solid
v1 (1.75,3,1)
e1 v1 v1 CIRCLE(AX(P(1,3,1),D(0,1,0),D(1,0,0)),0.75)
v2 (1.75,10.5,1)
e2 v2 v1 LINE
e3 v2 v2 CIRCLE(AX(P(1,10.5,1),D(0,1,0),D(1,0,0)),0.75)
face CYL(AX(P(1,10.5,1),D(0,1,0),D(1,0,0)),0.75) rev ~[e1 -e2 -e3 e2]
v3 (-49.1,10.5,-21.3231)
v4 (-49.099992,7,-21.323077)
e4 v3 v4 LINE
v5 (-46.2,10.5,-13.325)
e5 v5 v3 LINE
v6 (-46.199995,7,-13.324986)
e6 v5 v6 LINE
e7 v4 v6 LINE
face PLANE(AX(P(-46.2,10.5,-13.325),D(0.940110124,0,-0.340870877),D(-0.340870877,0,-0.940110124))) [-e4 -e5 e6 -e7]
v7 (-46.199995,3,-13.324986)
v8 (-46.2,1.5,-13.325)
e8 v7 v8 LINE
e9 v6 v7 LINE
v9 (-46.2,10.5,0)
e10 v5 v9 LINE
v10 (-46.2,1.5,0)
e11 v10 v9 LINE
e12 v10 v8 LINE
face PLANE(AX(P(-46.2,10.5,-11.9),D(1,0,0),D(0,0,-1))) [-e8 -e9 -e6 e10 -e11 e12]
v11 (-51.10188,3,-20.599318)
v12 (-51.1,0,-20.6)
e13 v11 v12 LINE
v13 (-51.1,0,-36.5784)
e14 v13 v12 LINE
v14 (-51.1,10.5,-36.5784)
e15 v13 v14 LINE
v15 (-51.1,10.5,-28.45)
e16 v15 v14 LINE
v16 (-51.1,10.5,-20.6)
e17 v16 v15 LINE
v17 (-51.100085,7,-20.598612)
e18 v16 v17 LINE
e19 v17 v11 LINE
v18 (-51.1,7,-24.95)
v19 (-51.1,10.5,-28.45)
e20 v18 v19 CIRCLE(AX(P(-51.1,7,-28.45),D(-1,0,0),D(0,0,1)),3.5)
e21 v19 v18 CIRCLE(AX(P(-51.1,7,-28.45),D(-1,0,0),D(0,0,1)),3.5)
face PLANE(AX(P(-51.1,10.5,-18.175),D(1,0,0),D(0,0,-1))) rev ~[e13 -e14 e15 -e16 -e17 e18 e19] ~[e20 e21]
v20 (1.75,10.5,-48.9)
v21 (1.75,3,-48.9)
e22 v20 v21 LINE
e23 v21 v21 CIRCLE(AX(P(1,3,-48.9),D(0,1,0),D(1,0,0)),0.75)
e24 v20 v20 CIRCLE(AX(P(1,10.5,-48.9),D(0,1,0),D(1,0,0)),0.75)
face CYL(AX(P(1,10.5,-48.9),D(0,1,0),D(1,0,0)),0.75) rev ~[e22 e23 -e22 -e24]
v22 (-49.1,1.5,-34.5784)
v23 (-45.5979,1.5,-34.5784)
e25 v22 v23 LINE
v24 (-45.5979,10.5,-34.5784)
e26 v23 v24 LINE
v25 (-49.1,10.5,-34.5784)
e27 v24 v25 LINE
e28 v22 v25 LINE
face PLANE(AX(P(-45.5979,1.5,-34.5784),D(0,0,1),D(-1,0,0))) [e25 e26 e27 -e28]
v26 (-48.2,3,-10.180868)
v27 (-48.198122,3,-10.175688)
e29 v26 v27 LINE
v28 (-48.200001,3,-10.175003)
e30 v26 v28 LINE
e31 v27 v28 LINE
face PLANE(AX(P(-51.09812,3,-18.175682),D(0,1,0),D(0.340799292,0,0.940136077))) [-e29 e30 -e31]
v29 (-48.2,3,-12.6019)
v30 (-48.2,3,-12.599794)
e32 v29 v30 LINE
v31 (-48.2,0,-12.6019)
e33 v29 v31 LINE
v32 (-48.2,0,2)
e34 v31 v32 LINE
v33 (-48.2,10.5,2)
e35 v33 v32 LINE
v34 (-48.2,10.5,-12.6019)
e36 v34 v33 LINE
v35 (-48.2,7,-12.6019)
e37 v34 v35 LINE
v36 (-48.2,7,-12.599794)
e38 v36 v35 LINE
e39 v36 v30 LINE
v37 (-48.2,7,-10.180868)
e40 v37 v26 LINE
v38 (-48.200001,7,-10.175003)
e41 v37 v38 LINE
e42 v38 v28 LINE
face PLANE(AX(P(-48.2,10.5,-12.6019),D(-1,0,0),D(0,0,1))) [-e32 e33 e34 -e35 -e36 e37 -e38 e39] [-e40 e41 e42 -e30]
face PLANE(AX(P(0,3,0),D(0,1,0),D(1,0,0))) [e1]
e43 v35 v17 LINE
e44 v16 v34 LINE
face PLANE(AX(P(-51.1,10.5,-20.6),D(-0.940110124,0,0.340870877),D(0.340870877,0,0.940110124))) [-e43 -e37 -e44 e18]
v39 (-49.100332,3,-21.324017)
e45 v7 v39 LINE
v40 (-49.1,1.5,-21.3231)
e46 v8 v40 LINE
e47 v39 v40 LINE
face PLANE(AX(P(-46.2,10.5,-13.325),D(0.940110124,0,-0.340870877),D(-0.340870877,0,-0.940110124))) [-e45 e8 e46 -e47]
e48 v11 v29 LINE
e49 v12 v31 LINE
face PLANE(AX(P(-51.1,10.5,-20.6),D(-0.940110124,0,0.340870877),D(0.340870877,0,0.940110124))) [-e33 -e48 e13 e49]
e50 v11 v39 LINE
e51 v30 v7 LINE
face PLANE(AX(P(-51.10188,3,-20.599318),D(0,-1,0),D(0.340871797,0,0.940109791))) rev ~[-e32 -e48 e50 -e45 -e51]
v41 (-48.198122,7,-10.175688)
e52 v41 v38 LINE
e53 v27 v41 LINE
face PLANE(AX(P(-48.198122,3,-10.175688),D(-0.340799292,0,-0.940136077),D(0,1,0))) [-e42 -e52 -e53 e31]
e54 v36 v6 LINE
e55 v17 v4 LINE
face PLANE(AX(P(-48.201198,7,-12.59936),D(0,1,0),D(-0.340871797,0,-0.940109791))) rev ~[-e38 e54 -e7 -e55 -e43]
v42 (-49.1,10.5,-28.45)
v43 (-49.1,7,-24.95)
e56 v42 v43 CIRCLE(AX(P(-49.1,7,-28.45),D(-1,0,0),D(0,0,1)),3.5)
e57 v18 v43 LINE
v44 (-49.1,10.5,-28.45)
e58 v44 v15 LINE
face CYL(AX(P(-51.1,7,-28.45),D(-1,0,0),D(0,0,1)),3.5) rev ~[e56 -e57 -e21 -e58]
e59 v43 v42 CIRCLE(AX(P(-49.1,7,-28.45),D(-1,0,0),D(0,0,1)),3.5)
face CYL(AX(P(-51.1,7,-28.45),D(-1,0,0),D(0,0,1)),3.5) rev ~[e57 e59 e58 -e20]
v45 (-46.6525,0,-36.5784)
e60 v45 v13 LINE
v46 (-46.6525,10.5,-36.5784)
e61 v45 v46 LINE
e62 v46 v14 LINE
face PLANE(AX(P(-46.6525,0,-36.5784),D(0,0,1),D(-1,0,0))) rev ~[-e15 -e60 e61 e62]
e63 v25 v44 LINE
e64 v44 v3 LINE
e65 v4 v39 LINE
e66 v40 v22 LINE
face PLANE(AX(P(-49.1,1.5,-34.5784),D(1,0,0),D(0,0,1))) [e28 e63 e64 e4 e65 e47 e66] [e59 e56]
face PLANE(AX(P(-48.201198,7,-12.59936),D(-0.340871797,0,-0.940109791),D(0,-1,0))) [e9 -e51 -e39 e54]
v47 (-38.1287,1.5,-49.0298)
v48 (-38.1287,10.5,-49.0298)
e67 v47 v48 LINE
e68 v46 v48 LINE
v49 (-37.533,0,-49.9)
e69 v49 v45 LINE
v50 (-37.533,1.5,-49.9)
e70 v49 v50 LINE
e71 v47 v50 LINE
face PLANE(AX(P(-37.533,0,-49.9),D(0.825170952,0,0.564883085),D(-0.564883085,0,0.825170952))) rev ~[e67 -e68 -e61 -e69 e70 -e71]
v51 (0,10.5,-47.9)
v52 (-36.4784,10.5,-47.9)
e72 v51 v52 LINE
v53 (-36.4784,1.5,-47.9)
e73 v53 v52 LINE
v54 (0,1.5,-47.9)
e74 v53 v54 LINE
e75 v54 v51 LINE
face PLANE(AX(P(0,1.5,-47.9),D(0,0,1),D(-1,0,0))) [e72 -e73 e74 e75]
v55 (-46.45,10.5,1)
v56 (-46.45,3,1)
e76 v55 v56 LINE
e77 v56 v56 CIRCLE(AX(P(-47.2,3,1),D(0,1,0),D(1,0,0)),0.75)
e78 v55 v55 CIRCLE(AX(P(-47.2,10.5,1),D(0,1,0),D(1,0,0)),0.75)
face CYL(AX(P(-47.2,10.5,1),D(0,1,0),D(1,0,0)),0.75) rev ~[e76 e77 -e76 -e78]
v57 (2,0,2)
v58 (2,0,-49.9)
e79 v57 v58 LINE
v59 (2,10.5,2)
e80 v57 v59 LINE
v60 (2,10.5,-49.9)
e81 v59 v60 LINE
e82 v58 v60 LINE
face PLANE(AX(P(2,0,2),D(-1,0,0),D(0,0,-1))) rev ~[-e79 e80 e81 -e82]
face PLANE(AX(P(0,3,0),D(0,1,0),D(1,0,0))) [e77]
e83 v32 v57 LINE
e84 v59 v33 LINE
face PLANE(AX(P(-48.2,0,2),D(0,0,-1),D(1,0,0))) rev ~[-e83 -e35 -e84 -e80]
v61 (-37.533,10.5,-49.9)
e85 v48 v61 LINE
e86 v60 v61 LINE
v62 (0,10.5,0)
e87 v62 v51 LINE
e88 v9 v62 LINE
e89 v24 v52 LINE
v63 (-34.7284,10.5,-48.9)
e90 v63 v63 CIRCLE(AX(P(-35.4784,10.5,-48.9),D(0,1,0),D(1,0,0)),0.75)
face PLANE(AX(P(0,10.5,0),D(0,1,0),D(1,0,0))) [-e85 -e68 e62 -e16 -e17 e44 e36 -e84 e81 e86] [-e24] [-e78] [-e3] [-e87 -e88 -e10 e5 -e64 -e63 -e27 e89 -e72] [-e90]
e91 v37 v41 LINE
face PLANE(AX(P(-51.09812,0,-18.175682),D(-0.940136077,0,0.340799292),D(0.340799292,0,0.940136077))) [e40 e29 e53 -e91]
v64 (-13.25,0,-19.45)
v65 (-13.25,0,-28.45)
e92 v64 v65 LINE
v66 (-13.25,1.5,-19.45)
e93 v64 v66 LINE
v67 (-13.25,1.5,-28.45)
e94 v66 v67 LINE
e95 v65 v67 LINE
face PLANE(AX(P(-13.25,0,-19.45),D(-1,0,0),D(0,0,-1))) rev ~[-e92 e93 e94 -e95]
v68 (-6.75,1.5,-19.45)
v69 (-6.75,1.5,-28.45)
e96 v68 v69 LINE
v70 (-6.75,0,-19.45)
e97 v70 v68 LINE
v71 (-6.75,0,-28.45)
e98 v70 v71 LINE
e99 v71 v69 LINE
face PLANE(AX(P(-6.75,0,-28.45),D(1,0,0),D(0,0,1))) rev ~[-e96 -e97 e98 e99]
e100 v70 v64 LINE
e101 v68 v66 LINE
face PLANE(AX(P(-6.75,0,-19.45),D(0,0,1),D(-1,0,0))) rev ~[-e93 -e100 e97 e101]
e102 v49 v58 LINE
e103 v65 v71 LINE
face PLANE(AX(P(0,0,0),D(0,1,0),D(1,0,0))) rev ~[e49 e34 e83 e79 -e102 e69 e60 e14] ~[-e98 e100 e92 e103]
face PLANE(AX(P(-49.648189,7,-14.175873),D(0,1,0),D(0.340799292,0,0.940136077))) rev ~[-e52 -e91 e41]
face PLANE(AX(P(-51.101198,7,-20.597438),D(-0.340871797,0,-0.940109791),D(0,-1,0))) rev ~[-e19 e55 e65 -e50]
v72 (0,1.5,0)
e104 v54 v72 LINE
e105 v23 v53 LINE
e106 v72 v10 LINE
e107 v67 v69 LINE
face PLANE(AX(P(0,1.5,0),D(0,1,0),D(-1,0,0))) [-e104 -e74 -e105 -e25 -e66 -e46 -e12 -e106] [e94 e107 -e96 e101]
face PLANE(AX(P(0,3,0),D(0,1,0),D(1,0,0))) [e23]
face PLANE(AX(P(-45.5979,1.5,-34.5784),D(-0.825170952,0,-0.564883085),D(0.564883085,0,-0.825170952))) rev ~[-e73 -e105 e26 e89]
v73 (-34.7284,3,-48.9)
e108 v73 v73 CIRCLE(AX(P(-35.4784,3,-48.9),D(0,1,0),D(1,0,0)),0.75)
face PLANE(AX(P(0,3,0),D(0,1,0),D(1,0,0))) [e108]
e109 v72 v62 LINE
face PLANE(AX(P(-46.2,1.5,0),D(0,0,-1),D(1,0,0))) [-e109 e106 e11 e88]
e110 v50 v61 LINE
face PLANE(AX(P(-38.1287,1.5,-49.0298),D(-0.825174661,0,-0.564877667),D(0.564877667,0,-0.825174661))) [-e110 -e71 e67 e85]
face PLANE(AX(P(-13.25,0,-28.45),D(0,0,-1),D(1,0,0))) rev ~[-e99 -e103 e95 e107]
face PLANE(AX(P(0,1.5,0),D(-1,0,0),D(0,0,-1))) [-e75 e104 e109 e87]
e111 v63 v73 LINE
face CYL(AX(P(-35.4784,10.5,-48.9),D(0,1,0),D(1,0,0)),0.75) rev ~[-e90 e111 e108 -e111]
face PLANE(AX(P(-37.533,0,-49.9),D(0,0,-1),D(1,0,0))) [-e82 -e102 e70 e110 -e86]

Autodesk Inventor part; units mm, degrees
ref_plane "YZ Plane" through (0, 0, 0) normal (1, 0, 0) x (0, 1, 0)
ref_plane "XZ Plane" through (0, 0, 0) normal (0, 1, 0) x (-1, 0, 0)
ref_plane "XY Plane" through (0, 0, 0) normal (0, 0, 1) x (1, 0, 0)
sketch "Sketch1" plane through (0, 0, 0) normal (0, 1, 0) x (-1, 0, 0)
  line L0 (0, 0) -> (49.1, 0)
  line L1 (49.1, -47.9) -> (0, -47.9)
  line L2 (0, -47.9) -> (0, 0)
  line L3 (46.7, -10.9) -> (49.1, -18.9)
  line L4 (46.7, -10.9) -> (46.7, 0)
  line L5 (49.1, 0) -> (46.7, 0)
  line L6 (49.1, -18.9) -> (49.1, -47.9)
  dimension "d0" = 49.1
  dimension "d1" = 47.9
  dimension "d2" = 18.9
extrude "Extrusion1" add sketch "Sketch1" along normal blind 1.5
sketch "Sketch2" plane through (0, 1.5, 0) normal (0, 1, 0) x (1, 0, 0)
  line L0 (-49.1, 18.9) -> (-46.7, 10.9) projected
  line L1 (-46.2, 10.9) -> (-46.2, 0)
  line L2 (-46.2, 0) -> (-46.7, 0)
  line L3 (-46.7, 10.9) -> (-46.7, 0) projected
  line L4 (-46.7, 0) -> (-46.7, 10.9)
  line L5 (-49.1, 47.9) -> (-49.1, 18.9) projected
  line L6 (-46.7, 10.9) -> (-49.1, 18.9)
  line L7 (-49.1, 18.9) -> (-46.2, 10.9)
  point P0 (0, 0)
extrude "Extrusion2" cut sketch "Sketch2" against normal blind 10
sketch "Sketch3" plane through (0, 1.5, 0) normal (0, 1, 0) x (1, 0, 0)
  line L0 (-49.1, 47.9) -> (-49.1, 18.9) projected
  line L1 (-49.1, 34.5784) -> (-45.5979, 34.5784)
  line L2 (-45.5979, 34.5784) -> (-36.4784, 47.9)
  line L3 (0, 47.9) -> (-49.1, 47.9) projected
  line L4 (-49.1, 47.9) -> (-36.4784, 47.9)
  line L5 (-49.1, 47.9) -> (-49.1, 34.5784)
  point P0 (0, 0)
extrude "Extrusion3" cut sketch "Sketch3" against normal blind 10
sketch "Sketch4" plane through (0, 1.5, 0) normal (0, 1, 0) x (1, 0, 0)
  line L0 (-46.2, 10.9) -> (-49.1, 18.9) projected
  line L1 (-46.2, 0) -> (0, 0) projected
  line L2 (-46.2, -2) -> (0, -2)
  line L3 (0, -2) -> (2, -2)
  line L4 (2, -2) -> (2, 47.9)
  line L5 (0, 47.9) -> (-36.4784, 47.9) projected
  line L6 (2, 47.9) -> (2, 49.9)
  line L7 (2, 49.9) -> (-36.4784, 49.9)
  line L8 (-38.1287, 49.0298) -> (-37.533, 49.9)
  line L9 (-37.533, 49.9) -> (-36.4784, 49.9)
  line L10 (-45.5979, 34.5784) -> (-36.4784, 47.9) projected
  line L11 (-49.1, 36.5784) -> (-46.6525, 36.5784)
  line L12 (-46.6525, 36.5784) -> (-37.533, 49.9)
  line L13 (-46.2, -2) -> (-48.2, -2)
  line L14 (-48.2, -2) -> (-48.2, 10.9)
  line L15 (-51.1, 18.9) -> (-48.2, 10.9)
  line L16 (-49.1, 36.5784) -> (-51.1, 36.5784)
  line L17 (-51.1, 36.5784) -> (-51.1, 18.9)
  line L18 (0, 0) -> (0, 47.9) projected
  line L19 (0, 0) -> (0, 47.9)
  line L20 (0, 47.9) -> (-36.4784, 47.9)
  line L21 (-36.4784, 47.9) -> (-45.5979, 34.5784)
  line L22 (-45.5979, 34.5784) -> (-49.1, 34.5784) projected
  line L23 (-49.1, 34.5784) -> (-45.5979, 34.5784)
  line L24 (-49.1, 34.5784) -> (-49.1, 18.9) projected
  line L25 (-49.1, 34.5784) -> (-49.1, 18.9)
  line L26 (-49.1, 18.9) -> (-46.2, 10.9)
  line L27 (-46.2, 0) -> (-46.2, 10.9)
  line L28 (-46.2, 0) -> (0, 0)
  dimension "d16" = 2
  dimension "d17" = 2
  dimension "d18" = 2
  dimension "d23" = 2
extrude "Extrusion4" add sketch "Sketch4" along normal blind 9
sketch "Sketch5" plane through (0, 0, 0) normal (0, -1, 0) x (1, 0, 0)
  line L0 (-46.2, 0) -> (0, 0) projected
  line L1 (0, 0) -> (-46.2, 0)
  line L2 (-46.2, 0) -> (-46.2, -10.9) projected
  line L3 (-46.2, 0) -> (-46.2, -10.9)
  line L4 (-46.2, -10.9) -> (-49.1, -18.9) projected
  line L5 (-46.2, -10.9) -> (-49.1, -18.9)
  line L6 (-49.1, -18.9) -> (-49.1, -34.5784) projected
  line L7 (-49.1, -18.9) -> (-49.1, -34.5784)
  line L8 (-49.1, -34.5784) -> (-45.5979, -34.5784) projected
  line L9 (-49.1, -34.5784) -> (-45.5979, -34.5784)
  line L10 (-36.4784, -47.9) -> (-45.5979, -34.5784) projected
  line L11 (-45.5979, -34.5784) -> (-36.4784, -47.9)
  line L12 (-36.4784, -47.9) -> (0, -47.9) projected
  line L13 (-36.4784, -47.9) -> (0, -47.9)
  line L14 (0, -47.9) -> (0, 0)
  line L15 (-48.2, 2) -> (2, 2) projected
  line L16 (2, 2) -> (-48.2, 2)
  line L17 (-51.1, -18.9) -> (-48.2, -10.9) projected
  line L18 (-48.2, 2) -> (-48.2, -10.9)
  line L19 (-48.2, -10.9) -> (-51.1, -18.9)
  line L20 (-51.1, -18.9) -> (-51.1, -36.5784)
  line L21 (-46.6525, -36.5784) -> (-51.1, -36.5784) projected
  line L22 (-51.1, -36.5784) -> (-46.6525, -36.5784)
  line L23 (-37.533, -49.9) -> (-46.6525, -36.5784) projected
  line L24 (-46.6525, -36.5784) -> (-37.533, -49.9)
  line L25 (2, 2) -> (2, -49.9) projected
  line L26 (-37.533, -49.9) -> (2, -49.9)
  line L27 (2, -49.9) -> (2, 2)
extrude "Extrusion5" add sketch "Sketch5" against normal blind 1.5
sketch "Sketch6" plane through (0, 10.5, 0) normal (0, 1, 0) x (1, 0, 0)
  line L0 (-48.2, -2) -> (2, -2) projected
  circle A0 centre (1, -1) radius 0.75
  line L1 (-46.2, 0) -> (-46.2, 10.9) projected
  circle A1 centre (-47.2, -1) radius 0.75
  point P0 (0, 0)
  dimension "d35" = 1.5
sketch "Sketch7" plane through (0, 10.5, 0) normal (0, 1, 0) x (1, 0, 0)
  point P0 (0, 0)
extrude "Extrusion6" cut sketch "Sketch6" against normal blind 7.5
sketch "Sketch8" plane through (0, 10.5, 0) normal (0, 1, 0) x (1, 0, 0)
  line L0 (-45.5979, 34.5784) -> (-36.4784, 47.9) projected
  circle A0 centre (-35.4784, 48.9) radius 0.75
  circle A1 centre (1, 48.9) radius 0.75
  point P0 (0, 0)
  dimension "d40" = 1.5
  dimension "d43" = 1.5
extrude "Extrusion7" cut sketch "Sketch8" against normal blind 7.5
sketch "Sketch9" plane through (0, 0, 0) normal (0, -1, 0) x (1, 0, 0)
  line L0 (-48.2, 2) -> (2, 2) projected
  line L1 (2, 2) -> (2, -49.9) projected
  line L2 (-6.75, -23.95) -> (-6.75, -19.45)
  line L3 (-6.75, -19.45) -> (-13.25, -19.45)
  line L4 (-13.25, -19.45) -> (-13.25, -28.45)
  line L5 (-13.25, -28.45) -> (-6.75, -28.45)
  line L6 (-6.75, -28.45) -> (-6.75, -23.95)
  point P0 (0, 0)
  dimension "d51" = 6.5
  dimension "d52" = 9
extrude "Extrusion8" cut sketch "Sketch9" against normal blind 1.5
sketch "Sketch10" plane through (0, 10.5, 0) normal (0, 1, 0) x (1, 0, 0)
  line L0 (-49.1, 18.9) -> (-46.2, 10.9) projected
  line L1 (-48.2, -2) -> (-48.2, 10.9) projected
  line L2 (-48.2, 10.9) -> (-51.1, 18.9) projected
  line L3 (-48.2, 10.175) -> (-48.2, 10.9)
  line L4 (-51.1, 18.9) -> (-51.1, 36.5784) projected
  line L5 (-51.1, 18.175) -> (-51.1, 18.9)
  line L6 (-51.1, 18.175) -> (-48.2, 10.175)
  line L7 (-48.2, 10.9) -> (-51.1, 18.9)
  point P0 (0, 0)
extrude "Extrusion9" add sketch "Sketch10" against normal blind 10.5
sketch "Sketch11" plane through (-51.1, 0, -18.175) normal (-0.9401361, 0, 0.3407993) x (0.3407993, 0, 0.9401361)
  point P0 (34.5018, 0)
sketch "Sketch12" plane through (-51.1, 0, -18.175) normal (-0.9401361, 0, 0.3407993) x (0.3407993, 0, 0.9401361)
  line L0 (0, 10.5) -> (0, 0) projected
  line L1 (5.4546, 0) -> (3.2394, 0) projected
  line L2 (4.2545, 0) -> (7.2545, 0) construction
  line L3 (4.2545, 7) -> (0, 7)
  line L4 (0, 7) -> (0, 3)
  line L5 (0, 3) -> (8.5094, 3)
  line L6 (8.5094, 1.5) -> (8.5094, 10.5) projected
  line L7 (4.2545, 7) -> (8.5094, 7)
  line L8 (8.5094, 10.5) -> (8.5094, 0) projected
  line L9 (8.5094, 3) -> (8.5094, 7)
  line L10 (0, 10.5) -> (8.5094, 10.5) projected
  line L11 (0, 10.5) -> (0, 0) projected
  line L12 (8.5094, 0) -> (0, 0) projected
  line L13 (8.5094, 10.5) -> (8.5094, 0) projected
  point P0 (34.5018, 0)
  dimension "d58" = 4.2545
extrude "Extrusion10" cut sketch "Sketch12" along normal blind 5 contours L3 L7 L6 L5 L0
sketch "Sketch14" plane through (0, 10.5, 0) normal (0, 1, 0) x (1, 0, 0)
  point P0 (0, 0)
sketch "Sketch15" plane through (0, 10.5, 0) normal (0, 1, 0) x (1, 0, 0)
  line L0 (-46.2, 0) -> (-46.2, 10.9) projected
  line L1 (-46.2, 10.9) -> (-46.2, 11.9)
  line L2 (-46.2, 11.9) -> (-49.1, 19.8981)
  line L3 (-49.1, 34.5784) -> (-49.1, 18.9) projected
  line L4 (-46.2, 11.9) -> (-37.6924, 11.9) construction
  line L5 (-49.1, 19.8981) -> (-49.1, 18.9)
  line L6 (-49.1, 18.9) -> (-46.2, 10.9) projected
  line L7 (-49.1, 18.9) -> (-46.2, 10.9)
  point P0 (0, 0)
  dimension "d71" = 1
  dimension "d72" = 109.93
extrude "Extrusion12" add sketch "Sketch15" against normal blind 9
sketch "Sketch16" plane through (0, 10.5, 0) normal (0, 1, 0) x (1, 0, 0)
  line L0 (-51.1, 18.175) -> (-48.2, 10.175) projected
  line L1 (-51.1, 18.175) -> (-51.1, 19.175)
  line L2 (-51.1, 36.5784) -> (-51.1, 18.175) projected
  line L3 (-51.1, 19.175) -> (-48.2, 11.1769)
  line L4 (-51.1, 19.175) -> (-42.5924, 19.175) construction
  line L5 (-48.2, 11.1769) -> (-48.2, 10.175)
  line L6 (-48.2, 10.175) -> (-48.2, -2) projected
  line L7 (-51.1, 18.175) -> (-48.2, 10.175)
  point P0 (0, 0)
  dimension "d75" = 1
  dimension "d76" = 70.07
extrude "Extrusion13" cut sketch "Sketch16" against normal blind 10.5
sketch "Sketch17" plane through (-51.1, 0, -36.5784) normal (-1, 0, 0) x (0, 0, 1)
  line L0 (-13.3216, 0) -> (-13.3216, 10.5) projected
  line L1 (36.8284, 10.5) -> (36.8284, 3) projected
  line L2 (38.5784, 0) -> (38.5784, 10.5) projected
  line L3 (15.9784, 5.25) -> (15.9784, 10.5) construction
  line L4 (16.6804, 10.5) -> (2, 10.5) projected
  point P0 (36.5784, 0)
sketch "Sketch18" plane through (0, 10.5, 0) normal (0, 1, 0) x (1, 0, 0)
  line L0 (-51.1, 19.175) -> (-51.1, 36.5784) projected
  line L1 (-51.1, 19.175) -> (-51.1, 20.6)
  line L2 (-51.1, 20.6) -> (-48.2, 12.6019)
  line L3 (-51.1, 20.6) -> (-42.5924, 20.6) construction
  line L4 (-51.1, 19.175) -> (-48.2, 11.1769) projected
  line L5 (-48.2, 12.6019) -> (-48.2, 11.1769)
  line L6 (-51.1, 19.175) -> (-48.2, 11.1769)
  point P0 (0, 0)
  dimension "d82" = 1.425
  dimension "d83" = 70.07
extrude "Extrusion14" cut sketch "Sketch18" against normal blind 10.5
sketch "Sketch19" plane through (0, 10.5, 0) normal (0, 1, 0) x (1, 0, 0)
  line L0 (-46.2, 11.9) -> (-49.1, 19.8981) projected
  line L1 (-46.2, 11.9) -> (-46.2, 13.325)
  line L2 (-46.2, 13.325) -> (-49.1, 21.3231)
  line L3 (-49.1, 19.8981) -> (-49.1, 34.5784) projected
  line L4 (-49.1, 21.3231) -> (-49.1, 19.8981)
  line L5 (-49.1, 19.8981) -> (-46.2, 11.9)
  point P0 (0, 0)
  dimension "d86" = 1.425
  dimension "d87" = 160.07
extrude "Extrusion15" add sketch "Sketch19" against normal blind 9
sketch "Sketch20" plane through (-51.1, 0, -20.6) normal (-0.9401098, 0, 0.3408718) x (0.3408718, 0, 0.9401098)
  line L0 (0, 3) -> (8.5096, 3)
  line L1 (8.5096, 10.5) -> (8.5096, 1.5) projected
  line L2 (8.5096, 3) -> (8.5096, 7)
  line L3 (8.5096, 7) -> (0.002, 7)
  line L4 (0.002, 10.5) -> (0.002, 1.5) projected
  line L5 (0, 3) -> (0.002, 7)
  point P0 (36.7848, 0)
  point P1 (0, 0)
  point P2 (8.5096, 7)
  dimension "d90" = 3
  dimension "d91" = 4
extrude "Extrusion16" cut sketch "Sketch20" against normal blind 10
sketch "Sketch21" plane through (-51.1, 0, -36.5784) normal (-1, 0, 0) x (0, 0, 1)
  point P0 (36.5784, 0)
sketch "Sketch22" plane through (-51.1, 0, -36.5784) normal (-1, 0, 0) x (0, 0, 1)
  line L0 (15.9784, 0) -> (0, 0) projected
  line L1 (17.1284, 0) -> (8.1284, 0) projected
  circle A0 centre (8.1284, 7) radius 3.5
  point P0 (36.5784, 0)
  dimension "d98" = 7
extrude "Extrusion17" cut sketch "Sketch22" against normal blind 10
properties part number "Case"
